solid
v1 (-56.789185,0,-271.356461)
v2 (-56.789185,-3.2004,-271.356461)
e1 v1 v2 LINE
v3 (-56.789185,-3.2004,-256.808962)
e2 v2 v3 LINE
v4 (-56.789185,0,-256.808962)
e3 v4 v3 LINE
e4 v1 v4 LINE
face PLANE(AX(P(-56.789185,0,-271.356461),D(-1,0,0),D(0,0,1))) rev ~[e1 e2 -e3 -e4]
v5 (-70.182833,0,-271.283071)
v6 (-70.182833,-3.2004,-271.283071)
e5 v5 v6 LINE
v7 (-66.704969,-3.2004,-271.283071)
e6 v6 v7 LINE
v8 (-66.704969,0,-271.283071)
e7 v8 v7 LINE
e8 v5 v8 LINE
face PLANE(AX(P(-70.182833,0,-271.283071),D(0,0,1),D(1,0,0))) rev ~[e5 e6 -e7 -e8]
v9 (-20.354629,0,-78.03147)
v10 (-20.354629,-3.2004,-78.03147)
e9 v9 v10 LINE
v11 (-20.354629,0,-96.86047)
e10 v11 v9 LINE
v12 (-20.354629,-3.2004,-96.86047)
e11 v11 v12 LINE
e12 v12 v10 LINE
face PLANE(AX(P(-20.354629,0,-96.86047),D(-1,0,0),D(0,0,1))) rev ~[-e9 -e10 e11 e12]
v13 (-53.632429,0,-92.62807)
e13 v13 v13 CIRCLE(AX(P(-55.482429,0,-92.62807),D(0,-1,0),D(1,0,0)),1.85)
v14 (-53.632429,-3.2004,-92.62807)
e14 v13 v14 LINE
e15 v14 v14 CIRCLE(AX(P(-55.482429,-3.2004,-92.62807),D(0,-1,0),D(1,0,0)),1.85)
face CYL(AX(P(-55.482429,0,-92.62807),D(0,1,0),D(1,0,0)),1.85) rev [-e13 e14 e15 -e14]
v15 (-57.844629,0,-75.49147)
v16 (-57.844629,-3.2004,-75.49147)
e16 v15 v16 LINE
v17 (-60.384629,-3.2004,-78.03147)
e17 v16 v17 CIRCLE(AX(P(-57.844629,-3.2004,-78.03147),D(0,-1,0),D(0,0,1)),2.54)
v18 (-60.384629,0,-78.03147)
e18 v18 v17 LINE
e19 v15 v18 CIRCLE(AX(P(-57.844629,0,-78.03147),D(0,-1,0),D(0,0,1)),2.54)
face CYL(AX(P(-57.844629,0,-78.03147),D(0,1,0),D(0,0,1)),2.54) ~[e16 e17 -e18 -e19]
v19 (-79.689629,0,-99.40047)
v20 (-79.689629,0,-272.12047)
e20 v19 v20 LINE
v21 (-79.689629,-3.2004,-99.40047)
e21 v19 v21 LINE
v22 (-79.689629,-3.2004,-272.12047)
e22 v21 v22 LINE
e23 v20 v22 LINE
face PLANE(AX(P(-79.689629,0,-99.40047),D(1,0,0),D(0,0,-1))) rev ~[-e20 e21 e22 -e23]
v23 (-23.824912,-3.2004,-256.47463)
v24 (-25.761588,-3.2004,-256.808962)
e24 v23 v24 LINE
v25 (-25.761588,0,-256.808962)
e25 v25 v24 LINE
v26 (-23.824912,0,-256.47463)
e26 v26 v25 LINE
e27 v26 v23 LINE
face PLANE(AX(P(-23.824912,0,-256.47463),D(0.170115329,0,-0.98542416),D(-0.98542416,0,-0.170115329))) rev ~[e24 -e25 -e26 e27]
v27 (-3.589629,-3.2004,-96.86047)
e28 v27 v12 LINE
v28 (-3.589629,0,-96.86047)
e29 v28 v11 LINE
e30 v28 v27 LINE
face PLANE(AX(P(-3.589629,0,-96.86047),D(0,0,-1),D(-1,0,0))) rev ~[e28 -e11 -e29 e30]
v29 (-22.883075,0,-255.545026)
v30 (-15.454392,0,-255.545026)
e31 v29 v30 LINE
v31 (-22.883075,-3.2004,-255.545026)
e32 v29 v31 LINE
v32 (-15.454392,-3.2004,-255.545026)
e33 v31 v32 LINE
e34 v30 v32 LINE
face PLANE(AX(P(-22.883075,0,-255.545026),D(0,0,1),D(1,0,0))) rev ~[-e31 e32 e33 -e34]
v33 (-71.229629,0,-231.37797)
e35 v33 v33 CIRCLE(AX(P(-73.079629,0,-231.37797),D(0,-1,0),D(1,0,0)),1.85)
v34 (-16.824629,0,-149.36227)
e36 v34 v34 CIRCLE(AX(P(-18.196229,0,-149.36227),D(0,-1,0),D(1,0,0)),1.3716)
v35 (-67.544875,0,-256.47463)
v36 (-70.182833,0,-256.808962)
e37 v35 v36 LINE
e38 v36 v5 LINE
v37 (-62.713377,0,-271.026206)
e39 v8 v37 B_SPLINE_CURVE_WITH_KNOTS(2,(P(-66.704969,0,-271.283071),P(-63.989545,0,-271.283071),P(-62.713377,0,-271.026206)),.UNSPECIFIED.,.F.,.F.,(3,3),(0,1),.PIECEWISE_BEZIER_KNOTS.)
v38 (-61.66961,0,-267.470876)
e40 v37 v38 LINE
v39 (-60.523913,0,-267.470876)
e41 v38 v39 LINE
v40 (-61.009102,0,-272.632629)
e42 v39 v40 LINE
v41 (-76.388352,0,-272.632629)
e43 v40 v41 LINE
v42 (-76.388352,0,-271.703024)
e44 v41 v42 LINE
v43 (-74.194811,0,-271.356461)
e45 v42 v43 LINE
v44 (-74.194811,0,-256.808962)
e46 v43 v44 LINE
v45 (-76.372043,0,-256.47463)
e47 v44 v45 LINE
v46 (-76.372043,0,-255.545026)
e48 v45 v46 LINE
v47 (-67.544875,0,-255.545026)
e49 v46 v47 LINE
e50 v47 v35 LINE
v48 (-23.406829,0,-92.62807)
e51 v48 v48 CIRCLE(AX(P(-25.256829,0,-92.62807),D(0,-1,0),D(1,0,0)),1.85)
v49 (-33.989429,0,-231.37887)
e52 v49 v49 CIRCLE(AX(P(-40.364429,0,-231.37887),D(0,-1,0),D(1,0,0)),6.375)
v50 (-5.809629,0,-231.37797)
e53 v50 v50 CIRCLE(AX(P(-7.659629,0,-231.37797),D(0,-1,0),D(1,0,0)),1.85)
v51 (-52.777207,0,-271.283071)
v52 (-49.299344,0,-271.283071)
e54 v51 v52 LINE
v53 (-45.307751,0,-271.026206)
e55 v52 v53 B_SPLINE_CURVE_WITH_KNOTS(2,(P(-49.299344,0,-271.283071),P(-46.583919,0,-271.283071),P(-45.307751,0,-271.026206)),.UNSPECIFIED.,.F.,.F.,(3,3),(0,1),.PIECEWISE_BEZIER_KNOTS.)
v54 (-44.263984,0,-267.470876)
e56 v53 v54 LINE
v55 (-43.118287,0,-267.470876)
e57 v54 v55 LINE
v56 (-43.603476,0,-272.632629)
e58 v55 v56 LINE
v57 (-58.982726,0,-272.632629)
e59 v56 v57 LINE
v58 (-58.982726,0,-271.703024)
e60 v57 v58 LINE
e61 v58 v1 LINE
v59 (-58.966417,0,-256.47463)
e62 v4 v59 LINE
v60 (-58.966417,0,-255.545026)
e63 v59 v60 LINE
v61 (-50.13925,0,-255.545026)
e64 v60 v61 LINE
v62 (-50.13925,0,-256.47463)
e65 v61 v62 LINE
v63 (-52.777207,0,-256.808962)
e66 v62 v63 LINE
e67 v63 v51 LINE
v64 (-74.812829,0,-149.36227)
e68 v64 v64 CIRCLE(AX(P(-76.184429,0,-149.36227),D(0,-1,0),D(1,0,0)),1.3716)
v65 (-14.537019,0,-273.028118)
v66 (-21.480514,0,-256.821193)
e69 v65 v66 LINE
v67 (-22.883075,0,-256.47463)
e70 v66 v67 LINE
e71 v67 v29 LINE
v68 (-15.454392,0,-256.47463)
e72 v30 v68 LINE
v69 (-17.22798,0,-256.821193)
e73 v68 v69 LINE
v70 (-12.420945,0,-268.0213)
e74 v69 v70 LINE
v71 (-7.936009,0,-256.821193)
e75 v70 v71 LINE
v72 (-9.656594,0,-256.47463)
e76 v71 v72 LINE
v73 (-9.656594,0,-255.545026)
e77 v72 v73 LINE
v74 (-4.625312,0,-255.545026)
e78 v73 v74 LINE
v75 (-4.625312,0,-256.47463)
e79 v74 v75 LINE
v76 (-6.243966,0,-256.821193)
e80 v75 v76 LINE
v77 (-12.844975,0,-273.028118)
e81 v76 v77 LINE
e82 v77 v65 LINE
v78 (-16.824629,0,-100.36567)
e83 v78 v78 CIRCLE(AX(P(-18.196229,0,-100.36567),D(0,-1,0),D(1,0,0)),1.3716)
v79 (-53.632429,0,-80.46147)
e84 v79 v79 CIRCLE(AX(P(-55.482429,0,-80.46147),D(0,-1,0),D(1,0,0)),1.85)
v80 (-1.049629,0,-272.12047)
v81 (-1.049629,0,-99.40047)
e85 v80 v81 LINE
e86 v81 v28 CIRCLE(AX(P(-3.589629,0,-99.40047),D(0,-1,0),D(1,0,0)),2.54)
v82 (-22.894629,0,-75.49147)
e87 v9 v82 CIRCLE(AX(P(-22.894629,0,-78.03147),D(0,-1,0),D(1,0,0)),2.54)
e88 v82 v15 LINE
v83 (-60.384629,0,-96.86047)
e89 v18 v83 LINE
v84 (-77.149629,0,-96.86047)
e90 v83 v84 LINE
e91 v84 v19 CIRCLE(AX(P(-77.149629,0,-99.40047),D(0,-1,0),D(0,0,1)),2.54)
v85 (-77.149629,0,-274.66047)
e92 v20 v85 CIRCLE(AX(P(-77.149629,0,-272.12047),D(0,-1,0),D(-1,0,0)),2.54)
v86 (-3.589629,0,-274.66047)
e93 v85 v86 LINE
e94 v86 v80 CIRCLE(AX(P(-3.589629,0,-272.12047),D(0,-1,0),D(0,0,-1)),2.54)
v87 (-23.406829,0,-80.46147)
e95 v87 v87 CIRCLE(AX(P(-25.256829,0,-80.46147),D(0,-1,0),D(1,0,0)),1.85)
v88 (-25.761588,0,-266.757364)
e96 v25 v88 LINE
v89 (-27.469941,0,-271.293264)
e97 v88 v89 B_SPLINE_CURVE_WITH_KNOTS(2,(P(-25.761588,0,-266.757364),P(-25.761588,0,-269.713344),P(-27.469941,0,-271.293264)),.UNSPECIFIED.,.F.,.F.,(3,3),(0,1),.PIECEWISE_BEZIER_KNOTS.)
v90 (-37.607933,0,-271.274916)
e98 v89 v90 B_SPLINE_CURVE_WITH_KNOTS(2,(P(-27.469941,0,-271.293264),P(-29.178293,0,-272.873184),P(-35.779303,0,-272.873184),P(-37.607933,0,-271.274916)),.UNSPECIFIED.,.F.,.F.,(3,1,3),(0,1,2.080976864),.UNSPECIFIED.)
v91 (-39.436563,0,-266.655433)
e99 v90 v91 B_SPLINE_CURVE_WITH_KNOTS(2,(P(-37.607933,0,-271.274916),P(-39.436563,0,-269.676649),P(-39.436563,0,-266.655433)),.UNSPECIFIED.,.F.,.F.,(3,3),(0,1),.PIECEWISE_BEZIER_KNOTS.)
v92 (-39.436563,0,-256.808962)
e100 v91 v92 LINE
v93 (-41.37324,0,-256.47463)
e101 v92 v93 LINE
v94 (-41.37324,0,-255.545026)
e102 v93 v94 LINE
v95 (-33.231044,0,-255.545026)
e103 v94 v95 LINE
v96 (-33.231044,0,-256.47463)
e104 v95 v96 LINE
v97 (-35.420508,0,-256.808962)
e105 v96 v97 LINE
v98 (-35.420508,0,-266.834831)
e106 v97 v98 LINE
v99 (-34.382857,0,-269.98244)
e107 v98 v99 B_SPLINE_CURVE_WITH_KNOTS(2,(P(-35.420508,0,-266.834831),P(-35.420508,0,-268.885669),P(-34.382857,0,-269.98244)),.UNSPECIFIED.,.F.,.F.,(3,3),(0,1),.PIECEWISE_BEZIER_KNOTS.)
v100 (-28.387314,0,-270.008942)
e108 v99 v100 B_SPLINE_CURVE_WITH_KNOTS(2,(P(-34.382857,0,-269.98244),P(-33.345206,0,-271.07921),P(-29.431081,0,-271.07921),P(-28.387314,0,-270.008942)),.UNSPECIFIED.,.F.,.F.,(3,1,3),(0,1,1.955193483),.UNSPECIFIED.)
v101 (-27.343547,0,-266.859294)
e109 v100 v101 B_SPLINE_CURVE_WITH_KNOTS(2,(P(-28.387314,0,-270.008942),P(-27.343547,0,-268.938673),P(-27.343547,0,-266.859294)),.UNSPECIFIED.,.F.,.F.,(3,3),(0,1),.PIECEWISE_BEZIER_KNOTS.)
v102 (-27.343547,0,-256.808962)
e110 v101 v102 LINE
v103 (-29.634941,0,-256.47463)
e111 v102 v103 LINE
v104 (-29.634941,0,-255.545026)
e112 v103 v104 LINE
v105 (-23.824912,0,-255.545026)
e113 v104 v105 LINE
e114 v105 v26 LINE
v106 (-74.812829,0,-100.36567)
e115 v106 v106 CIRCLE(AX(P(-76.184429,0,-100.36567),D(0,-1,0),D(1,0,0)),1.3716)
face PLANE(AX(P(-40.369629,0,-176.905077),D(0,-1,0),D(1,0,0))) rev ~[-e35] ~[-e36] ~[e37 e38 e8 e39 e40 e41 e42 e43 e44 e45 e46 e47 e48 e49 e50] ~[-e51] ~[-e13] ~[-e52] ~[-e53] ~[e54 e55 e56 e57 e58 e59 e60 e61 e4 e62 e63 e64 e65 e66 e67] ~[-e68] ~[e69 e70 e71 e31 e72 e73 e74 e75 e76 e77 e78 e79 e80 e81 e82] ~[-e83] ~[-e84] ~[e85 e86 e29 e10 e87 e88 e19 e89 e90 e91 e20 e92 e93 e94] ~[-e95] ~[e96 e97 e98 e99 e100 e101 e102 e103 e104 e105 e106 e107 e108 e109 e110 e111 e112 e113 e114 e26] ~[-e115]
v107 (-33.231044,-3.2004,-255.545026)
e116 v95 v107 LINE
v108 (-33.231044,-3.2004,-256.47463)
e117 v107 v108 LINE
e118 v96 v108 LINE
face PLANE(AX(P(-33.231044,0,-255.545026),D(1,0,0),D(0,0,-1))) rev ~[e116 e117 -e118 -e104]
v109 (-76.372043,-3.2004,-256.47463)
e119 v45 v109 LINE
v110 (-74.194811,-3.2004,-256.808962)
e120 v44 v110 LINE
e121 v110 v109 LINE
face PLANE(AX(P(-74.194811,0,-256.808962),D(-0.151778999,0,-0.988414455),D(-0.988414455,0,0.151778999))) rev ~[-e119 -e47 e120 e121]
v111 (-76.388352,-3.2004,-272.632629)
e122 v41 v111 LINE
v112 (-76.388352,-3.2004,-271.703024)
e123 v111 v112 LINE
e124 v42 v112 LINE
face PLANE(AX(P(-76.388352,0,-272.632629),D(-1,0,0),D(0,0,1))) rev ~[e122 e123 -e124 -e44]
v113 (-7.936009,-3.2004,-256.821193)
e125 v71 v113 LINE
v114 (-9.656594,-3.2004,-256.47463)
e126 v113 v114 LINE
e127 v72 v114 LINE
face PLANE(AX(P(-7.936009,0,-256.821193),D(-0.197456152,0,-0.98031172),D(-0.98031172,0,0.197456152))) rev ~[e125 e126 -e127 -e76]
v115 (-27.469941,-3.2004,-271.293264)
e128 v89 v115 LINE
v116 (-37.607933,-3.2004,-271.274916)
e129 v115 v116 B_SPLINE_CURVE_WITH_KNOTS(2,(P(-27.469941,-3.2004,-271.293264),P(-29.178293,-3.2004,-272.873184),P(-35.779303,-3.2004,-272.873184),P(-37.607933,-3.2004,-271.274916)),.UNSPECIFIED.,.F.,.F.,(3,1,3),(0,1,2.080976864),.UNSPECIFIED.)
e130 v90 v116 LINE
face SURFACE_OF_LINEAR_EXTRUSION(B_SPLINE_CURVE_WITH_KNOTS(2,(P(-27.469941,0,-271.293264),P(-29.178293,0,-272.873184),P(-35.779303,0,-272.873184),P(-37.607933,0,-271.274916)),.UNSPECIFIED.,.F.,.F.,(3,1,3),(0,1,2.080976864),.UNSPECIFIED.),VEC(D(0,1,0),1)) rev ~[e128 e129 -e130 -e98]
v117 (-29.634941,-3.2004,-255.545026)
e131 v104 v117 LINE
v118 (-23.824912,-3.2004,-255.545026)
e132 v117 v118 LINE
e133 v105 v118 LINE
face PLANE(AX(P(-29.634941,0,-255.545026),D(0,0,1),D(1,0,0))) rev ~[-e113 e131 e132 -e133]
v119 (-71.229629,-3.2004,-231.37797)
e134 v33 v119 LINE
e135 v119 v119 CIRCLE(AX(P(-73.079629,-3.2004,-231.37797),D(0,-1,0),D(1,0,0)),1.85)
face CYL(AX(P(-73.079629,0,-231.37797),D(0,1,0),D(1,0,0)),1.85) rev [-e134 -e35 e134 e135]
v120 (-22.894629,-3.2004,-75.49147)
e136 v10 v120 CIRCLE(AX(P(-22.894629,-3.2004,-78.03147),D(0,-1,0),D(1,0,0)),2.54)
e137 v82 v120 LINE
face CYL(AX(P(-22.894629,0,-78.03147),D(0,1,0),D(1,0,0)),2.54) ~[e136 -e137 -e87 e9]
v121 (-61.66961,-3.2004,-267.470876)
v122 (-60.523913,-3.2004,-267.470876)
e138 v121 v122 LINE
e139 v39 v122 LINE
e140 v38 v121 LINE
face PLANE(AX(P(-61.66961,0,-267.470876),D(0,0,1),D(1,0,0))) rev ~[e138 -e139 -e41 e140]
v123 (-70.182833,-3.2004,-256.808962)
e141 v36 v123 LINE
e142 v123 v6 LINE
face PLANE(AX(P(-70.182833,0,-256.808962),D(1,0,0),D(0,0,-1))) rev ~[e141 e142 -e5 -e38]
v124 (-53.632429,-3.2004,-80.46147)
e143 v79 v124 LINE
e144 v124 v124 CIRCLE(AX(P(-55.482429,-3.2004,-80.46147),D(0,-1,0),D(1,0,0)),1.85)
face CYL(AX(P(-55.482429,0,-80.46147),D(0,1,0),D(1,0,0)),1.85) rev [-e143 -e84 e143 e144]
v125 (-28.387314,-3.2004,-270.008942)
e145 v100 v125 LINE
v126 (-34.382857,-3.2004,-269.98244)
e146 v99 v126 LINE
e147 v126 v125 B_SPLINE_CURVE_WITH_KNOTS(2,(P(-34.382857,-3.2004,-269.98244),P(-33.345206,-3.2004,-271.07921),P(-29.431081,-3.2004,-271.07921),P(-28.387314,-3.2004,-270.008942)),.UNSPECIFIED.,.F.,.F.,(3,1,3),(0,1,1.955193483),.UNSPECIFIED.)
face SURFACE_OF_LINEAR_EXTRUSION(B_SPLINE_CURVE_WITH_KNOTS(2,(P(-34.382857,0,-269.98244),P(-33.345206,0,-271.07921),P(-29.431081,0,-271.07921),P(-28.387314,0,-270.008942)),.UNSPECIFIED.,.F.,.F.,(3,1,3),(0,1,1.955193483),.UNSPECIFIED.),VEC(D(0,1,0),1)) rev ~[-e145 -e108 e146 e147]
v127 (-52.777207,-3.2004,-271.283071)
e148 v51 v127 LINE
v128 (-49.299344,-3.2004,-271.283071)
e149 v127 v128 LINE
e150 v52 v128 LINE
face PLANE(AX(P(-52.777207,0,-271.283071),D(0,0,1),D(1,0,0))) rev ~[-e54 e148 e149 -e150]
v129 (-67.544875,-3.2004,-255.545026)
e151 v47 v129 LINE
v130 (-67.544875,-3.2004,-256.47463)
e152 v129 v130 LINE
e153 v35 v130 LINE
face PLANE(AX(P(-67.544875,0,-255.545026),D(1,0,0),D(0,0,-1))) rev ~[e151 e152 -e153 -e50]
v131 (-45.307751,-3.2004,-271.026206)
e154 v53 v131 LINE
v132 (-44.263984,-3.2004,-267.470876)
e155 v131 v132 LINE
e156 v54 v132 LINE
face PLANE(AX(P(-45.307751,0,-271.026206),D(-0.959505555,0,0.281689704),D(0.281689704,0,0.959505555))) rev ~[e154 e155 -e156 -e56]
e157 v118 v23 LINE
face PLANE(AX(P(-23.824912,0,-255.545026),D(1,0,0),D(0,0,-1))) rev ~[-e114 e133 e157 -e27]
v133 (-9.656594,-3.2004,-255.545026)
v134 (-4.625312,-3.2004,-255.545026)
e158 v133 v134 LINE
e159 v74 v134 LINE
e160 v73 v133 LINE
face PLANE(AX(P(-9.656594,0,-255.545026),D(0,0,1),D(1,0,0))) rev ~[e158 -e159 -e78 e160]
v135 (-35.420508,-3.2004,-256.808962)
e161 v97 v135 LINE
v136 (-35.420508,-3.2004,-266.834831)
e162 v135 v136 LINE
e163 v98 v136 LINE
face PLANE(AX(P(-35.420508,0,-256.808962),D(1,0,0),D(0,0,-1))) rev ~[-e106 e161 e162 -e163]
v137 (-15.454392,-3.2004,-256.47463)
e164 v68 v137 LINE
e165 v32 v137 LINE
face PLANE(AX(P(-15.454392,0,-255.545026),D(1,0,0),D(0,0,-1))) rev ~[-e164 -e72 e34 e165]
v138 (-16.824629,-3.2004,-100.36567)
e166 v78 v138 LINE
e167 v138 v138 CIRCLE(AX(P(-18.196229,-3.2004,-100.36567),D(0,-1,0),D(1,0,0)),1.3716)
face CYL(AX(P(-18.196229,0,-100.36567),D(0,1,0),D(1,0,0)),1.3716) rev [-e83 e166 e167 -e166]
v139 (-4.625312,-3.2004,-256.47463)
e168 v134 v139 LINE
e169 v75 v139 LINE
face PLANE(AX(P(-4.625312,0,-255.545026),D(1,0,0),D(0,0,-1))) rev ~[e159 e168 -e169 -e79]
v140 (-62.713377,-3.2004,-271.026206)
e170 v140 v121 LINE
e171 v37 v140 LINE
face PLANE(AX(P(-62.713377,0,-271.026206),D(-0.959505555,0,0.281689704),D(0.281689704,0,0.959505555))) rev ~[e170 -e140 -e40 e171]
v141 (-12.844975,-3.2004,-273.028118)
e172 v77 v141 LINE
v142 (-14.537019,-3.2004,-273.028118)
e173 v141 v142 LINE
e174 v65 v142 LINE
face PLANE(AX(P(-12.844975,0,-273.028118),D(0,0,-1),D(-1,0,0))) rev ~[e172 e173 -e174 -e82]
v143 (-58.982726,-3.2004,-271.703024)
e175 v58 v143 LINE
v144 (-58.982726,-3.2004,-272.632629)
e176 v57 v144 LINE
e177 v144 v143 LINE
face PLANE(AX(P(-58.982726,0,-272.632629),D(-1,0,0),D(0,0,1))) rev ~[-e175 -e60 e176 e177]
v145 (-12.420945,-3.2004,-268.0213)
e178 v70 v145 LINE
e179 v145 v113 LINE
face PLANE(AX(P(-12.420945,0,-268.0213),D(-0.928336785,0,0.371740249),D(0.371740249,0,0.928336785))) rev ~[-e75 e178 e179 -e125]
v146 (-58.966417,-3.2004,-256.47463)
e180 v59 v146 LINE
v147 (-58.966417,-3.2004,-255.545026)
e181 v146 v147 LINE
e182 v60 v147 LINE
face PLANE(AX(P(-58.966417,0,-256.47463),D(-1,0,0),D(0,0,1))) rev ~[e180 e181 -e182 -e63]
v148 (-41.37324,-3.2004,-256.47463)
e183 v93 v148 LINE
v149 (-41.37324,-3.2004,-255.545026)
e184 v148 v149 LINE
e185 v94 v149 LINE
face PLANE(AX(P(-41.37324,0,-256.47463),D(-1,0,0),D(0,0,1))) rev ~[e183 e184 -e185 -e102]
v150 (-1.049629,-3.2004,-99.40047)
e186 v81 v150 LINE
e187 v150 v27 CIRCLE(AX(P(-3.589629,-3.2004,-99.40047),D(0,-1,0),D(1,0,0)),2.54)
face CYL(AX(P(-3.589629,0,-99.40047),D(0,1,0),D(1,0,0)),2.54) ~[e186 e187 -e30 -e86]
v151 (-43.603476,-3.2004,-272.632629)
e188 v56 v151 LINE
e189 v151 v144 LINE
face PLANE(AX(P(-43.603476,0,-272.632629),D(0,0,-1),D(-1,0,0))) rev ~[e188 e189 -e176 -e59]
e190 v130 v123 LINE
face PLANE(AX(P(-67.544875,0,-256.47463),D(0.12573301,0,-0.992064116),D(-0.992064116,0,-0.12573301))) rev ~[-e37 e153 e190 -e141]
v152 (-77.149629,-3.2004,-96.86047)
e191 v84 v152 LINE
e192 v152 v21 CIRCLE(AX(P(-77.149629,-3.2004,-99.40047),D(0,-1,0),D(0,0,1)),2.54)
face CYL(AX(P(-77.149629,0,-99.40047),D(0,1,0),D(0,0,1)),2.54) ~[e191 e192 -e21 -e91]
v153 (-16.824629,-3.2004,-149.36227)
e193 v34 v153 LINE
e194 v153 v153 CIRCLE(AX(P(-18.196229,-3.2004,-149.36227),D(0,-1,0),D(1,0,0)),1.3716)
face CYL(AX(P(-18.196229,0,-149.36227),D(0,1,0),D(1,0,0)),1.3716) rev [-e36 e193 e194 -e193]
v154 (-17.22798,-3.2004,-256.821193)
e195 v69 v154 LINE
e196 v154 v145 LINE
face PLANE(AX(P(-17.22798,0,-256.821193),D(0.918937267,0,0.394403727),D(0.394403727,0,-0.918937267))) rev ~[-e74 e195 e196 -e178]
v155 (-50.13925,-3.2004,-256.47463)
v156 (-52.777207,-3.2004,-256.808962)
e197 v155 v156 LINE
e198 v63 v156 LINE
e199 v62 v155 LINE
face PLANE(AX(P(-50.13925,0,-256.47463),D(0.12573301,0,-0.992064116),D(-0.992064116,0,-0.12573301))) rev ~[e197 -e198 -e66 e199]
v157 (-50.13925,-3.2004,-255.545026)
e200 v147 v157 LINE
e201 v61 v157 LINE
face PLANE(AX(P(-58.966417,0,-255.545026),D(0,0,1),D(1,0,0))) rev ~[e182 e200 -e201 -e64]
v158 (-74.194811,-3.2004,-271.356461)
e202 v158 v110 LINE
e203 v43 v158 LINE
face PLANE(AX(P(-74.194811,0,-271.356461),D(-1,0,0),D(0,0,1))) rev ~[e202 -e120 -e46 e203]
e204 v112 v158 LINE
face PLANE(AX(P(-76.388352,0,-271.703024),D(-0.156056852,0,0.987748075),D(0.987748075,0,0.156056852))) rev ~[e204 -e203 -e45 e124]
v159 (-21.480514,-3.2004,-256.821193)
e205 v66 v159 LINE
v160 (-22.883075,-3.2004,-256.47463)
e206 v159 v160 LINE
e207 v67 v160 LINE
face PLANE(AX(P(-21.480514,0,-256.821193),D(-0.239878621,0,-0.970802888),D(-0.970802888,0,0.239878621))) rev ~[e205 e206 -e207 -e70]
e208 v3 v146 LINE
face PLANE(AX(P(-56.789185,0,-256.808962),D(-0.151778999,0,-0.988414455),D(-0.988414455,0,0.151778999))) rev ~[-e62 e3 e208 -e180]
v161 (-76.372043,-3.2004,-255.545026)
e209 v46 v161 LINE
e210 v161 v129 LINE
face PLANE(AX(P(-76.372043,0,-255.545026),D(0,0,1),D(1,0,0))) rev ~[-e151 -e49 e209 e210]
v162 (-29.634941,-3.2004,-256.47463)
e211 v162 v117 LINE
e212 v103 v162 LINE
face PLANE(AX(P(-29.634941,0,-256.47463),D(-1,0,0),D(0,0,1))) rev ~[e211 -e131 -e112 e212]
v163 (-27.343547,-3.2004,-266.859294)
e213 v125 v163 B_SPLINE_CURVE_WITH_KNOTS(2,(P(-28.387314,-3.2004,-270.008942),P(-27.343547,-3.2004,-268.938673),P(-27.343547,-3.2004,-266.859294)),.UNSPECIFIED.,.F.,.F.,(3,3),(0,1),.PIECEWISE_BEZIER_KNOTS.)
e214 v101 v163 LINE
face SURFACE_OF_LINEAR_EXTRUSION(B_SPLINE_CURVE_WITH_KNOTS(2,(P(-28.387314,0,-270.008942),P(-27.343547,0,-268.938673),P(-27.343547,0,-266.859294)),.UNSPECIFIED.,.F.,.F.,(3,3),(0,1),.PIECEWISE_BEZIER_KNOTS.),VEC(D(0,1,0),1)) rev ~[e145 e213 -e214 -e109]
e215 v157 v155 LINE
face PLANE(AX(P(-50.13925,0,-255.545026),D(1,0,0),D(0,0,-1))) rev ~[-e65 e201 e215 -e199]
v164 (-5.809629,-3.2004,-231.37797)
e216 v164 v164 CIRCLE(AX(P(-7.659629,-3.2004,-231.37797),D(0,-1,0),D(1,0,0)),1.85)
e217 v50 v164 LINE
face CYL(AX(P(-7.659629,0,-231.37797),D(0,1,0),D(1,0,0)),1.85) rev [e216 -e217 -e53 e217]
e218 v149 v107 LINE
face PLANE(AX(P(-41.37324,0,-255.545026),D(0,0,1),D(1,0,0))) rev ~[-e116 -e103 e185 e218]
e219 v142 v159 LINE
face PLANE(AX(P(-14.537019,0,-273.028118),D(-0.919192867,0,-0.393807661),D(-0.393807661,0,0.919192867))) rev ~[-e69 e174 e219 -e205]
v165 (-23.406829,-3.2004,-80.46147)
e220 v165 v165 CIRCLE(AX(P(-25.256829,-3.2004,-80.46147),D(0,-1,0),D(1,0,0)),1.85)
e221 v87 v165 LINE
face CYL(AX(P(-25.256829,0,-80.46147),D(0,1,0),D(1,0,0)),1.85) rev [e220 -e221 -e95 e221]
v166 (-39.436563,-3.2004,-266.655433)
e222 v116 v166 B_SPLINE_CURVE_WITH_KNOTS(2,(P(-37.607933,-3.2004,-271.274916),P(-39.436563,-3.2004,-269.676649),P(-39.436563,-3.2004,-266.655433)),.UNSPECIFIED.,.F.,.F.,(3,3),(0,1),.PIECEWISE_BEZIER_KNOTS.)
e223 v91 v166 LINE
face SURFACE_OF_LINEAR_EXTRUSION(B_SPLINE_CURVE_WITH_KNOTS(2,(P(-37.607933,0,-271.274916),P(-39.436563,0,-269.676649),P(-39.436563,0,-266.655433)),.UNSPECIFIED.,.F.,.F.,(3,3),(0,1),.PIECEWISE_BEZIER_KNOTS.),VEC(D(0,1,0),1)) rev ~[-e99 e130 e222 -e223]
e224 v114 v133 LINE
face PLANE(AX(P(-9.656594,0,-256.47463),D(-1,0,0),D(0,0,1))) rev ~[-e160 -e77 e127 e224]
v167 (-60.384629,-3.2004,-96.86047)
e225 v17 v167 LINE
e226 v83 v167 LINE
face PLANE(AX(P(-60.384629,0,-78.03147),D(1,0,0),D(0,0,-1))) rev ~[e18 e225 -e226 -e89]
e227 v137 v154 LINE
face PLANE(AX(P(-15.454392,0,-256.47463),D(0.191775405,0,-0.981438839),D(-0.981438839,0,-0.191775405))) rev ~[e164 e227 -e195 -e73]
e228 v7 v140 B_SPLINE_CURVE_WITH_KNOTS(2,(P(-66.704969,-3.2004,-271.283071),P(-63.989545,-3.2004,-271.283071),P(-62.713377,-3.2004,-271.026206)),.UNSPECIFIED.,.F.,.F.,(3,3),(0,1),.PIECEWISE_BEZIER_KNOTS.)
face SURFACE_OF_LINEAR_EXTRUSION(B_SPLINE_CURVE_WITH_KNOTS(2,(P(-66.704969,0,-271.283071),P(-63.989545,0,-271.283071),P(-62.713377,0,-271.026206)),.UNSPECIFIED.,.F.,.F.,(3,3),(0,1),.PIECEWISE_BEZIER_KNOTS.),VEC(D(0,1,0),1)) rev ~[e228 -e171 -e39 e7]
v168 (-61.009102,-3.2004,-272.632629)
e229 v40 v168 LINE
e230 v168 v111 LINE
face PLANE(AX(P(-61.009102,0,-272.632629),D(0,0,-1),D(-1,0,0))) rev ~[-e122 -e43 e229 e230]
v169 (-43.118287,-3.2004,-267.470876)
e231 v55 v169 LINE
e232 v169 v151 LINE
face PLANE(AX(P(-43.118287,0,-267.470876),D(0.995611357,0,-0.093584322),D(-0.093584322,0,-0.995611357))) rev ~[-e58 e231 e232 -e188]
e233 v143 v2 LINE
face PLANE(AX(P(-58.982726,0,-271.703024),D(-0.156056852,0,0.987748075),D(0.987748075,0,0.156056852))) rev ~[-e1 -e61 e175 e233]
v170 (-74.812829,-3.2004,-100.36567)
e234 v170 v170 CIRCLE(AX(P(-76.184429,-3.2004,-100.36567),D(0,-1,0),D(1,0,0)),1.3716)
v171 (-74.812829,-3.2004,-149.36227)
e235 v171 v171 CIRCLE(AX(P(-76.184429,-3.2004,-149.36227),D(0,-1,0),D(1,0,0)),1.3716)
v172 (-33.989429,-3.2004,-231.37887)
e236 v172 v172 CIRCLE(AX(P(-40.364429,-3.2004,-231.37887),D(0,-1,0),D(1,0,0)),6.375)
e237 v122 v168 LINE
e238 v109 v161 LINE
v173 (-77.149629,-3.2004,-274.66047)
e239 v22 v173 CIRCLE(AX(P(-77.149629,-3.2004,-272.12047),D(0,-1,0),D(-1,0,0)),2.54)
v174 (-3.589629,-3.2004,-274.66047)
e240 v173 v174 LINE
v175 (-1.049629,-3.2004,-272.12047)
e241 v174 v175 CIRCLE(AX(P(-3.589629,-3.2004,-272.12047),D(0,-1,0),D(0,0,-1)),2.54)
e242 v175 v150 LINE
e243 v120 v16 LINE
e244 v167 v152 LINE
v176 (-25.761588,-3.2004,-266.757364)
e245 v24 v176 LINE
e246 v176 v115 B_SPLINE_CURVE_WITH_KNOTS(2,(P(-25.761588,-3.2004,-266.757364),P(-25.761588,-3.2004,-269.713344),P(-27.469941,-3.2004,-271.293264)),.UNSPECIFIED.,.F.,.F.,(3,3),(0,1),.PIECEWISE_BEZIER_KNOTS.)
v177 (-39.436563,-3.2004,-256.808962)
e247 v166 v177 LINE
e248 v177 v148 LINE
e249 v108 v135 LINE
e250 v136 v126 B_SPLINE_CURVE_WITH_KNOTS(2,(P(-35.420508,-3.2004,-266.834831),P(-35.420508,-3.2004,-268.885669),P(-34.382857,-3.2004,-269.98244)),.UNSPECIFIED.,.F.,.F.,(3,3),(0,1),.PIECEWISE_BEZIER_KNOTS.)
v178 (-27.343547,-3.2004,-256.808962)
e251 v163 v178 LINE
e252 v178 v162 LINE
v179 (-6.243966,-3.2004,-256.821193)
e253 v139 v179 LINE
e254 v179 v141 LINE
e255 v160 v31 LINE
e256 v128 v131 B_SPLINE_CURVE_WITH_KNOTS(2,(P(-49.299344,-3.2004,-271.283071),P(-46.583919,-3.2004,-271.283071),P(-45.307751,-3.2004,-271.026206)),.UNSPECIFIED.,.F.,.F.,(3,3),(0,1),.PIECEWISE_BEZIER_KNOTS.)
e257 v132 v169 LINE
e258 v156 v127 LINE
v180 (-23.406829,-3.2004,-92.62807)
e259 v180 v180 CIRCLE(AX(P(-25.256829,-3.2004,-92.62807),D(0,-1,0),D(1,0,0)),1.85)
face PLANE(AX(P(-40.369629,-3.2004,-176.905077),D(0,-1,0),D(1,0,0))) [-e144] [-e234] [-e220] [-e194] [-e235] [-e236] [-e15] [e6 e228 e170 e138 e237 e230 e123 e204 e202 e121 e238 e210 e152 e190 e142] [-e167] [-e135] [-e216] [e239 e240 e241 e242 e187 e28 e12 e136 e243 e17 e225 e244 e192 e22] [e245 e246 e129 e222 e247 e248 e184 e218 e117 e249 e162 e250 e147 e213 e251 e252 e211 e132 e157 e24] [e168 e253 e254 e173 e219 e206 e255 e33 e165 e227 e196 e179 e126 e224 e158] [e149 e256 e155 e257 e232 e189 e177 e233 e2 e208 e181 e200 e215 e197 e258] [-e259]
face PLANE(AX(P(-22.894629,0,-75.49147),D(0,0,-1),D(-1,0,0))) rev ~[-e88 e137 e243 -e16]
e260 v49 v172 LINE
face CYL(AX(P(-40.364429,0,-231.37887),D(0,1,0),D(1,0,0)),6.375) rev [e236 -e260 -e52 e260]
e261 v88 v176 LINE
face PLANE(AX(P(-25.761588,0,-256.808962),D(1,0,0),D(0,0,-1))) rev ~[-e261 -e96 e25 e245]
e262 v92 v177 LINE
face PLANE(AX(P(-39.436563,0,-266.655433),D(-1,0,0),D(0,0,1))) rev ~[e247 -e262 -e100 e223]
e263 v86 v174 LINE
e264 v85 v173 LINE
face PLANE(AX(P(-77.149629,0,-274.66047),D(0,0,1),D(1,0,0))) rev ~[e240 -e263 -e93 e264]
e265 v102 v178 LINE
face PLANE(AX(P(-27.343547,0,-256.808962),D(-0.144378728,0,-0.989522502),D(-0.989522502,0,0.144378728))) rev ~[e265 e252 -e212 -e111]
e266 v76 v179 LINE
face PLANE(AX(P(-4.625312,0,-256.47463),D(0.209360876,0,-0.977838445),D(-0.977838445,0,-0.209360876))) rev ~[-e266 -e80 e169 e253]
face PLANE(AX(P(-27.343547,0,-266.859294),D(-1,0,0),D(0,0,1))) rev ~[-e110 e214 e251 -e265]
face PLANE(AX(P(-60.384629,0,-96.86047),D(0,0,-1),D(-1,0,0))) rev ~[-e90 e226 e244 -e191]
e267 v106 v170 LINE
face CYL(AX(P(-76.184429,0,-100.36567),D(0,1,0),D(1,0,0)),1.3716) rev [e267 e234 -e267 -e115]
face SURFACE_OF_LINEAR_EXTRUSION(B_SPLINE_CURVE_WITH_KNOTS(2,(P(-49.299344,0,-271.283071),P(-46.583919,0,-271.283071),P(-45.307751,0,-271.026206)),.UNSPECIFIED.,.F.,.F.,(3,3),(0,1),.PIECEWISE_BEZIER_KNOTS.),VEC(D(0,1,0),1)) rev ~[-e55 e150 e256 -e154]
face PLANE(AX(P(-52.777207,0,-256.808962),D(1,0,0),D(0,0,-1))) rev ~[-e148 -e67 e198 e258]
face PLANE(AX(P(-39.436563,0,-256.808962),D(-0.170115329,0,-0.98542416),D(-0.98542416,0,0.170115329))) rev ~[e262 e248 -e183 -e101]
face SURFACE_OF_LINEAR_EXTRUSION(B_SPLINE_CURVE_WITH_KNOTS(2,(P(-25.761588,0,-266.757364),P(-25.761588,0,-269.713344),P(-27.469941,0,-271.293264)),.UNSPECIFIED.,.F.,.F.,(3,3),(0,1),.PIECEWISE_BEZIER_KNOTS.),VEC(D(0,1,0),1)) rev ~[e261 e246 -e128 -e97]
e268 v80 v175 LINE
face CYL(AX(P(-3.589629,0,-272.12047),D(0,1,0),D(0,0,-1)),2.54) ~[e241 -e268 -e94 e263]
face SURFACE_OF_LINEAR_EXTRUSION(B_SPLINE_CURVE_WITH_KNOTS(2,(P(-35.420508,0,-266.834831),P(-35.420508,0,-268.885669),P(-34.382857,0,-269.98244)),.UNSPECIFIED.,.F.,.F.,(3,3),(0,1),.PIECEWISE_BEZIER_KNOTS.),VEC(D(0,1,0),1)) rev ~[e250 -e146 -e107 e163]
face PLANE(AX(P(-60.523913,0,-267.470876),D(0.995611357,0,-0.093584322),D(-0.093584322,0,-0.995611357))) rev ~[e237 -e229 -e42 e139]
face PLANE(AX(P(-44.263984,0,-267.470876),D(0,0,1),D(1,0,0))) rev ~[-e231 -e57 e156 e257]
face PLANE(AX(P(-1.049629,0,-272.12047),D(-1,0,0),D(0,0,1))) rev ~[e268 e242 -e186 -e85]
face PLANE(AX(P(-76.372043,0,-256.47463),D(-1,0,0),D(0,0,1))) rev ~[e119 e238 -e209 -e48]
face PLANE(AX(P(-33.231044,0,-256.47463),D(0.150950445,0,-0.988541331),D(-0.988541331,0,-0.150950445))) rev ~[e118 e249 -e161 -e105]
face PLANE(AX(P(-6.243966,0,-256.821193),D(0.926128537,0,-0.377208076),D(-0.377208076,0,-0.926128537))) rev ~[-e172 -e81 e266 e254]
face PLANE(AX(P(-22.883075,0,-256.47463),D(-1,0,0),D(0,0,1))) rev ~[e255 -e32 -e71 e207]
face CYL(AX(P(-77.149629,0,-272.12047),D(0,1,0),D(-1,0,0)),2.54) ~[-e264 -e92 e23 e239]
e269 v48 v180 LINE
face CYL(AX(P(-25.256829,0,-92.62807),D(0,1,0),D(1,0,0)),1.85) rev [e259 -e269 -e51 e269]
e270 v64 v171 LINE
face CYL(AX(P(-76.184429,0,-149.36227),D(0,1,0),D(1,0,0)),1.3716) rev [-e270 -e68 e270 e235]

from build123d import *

# Parameters (mm, degrees)
F0_R     = 1.85
F0_R_2   = 6.375
F0_R_3   = 1.3716
F1_DEPTH = 3.2004


with BuildPart() as f1:
    # F0 (on Front) → F1 (new body)
    with BuildSketch(Plane.XZ):
        with BuildLine():
            ThreePointArc((-79.689629, -272.1204697257), (-78.9456802243, -273.91652095), (-77.149629, -274.6604697257))
            Line((-77.149629, -274.6604697257), (-3.589629, -274.6604697257))
            ThreePointArc((-3.589629, -274.6604697257), (-1.7935777758, -273.9165209499), (-1.049629, -272.1204697257))
            Line((-1.049629, -272.1204697257), (-1.049629, -99.4004697257))
            ThreePointArc((-1.049629, -99.4004697257), (-1.7935777758, -97.6044185016), (-3.589629, -96.8604697257))
            Line((-3.589629, -96.8604697257), (-20.354629, -96.8604697257))
            Line((-20.354629, -96.8604697257), (-20.354629, -78.0314697257))
            ThreePointArc((-20.354629, -78.0314697257), (-21.0985777758, -76.2354185016), (-22.894629, -75.4914697257))
            Line((-22.894629, -75.4914697257), (-57.844629, -75.4914697257))
            ThreePointArc((-57.844629, -75.4914697257), (-59.6406802243, -76.2354185015), (-60.384629, -78.0314697257))
            Line((-60.384629, -78.0314697257), (-60.384629, -96.8604697257))
            Line((-60.384629, -96.8604697257), (-77.149629, -96.8604697257))
            ThreePointArc((-77.149629, -96.8604697257), (-78.9456802243, -97.6044185015), (-79.689629, -99.4004697257))
            Line((-79.689629, -99.4004697257), (-79.689629, -272.1204697257))
        make_face()
        with BuildLine():
            Line((-67.5448753625, -255.545025575), (-67.5448753625, -256.4746303251))
            Line((-67.5448753625, -256.4746303251), (-70.1828327017, -256.808961858))
            Line((-70.1828327017, -256.808961858), (-70.1828327017, -271.2830709061))
            Line((-70.1828327017, -271.2830709061), (-66.7049693163, -271.2830709061))
            add(Edge.make_bspline(
                [(-66.7049693163, -271.2830709061), (-63.9895449146, -271.2830709061), (-62.7133769901, -271.0262064356)],
                knots=[0, 0, 0, 1, 1, 1], degree=2))
            Line((-62.7133769901, -271.0262064356), (-61.6696102531, -267.4708759878))
            Line((-61.6696102531, -267.4708759878), (-60.5239131707, -267.4708759878))
            Line((-60.5239131707, -267.4708759878), (-61.0091016149, -272.6326286793))
            Line((-61.0091016149, -272.6326286793), (-76.3883521301, -272.6326286793))
            Line((-76.3883521301, -272.6326286793), (-76.3883521301, -271.7030239291))
            Line((-76.3883521301, -271.7030239291), (-74.1948110969, -271.3564607548))
            Line((-74.1948110969, -271.3564607548), (-74.1948110969, -256.808961858))
            Line((-74.1948110969, -256.808961858), (-76.3720432749, -256.4746303251))
            Line((-76.3720432749, -256.4746303251), (-76.3720432749, -255.545025575))
            Line((-76.3720432749, -255.545025575), (-67.5448753625, -255.545025575))
        make_face(mode=Mode.SUBTRACT)
        with Locations((-73.079629, -231.3779697257)):
            Circle(F0_R, mode=Mode.SUBTRACT)
        with BuildLine():
            Line((-50.1392495805, -255.545025575), (-50.1392495805, -256.4746303251))
            Line((-50.1392495805, -256.4746303251), (-52.7772069197, -256.808961858))
            Line((-52.7772069197, -256.808961858), (-52.7772069197, -271.2830709061))
            Line((-52.7772069197, -271.2830709061), (-49.2993435343, -271.2830709061))
            add(Edge.make_bspline(
                [(-49.2993435343, -271.2830709061), (-46.5839191327, -271.2830709061), (-45.3077512081, -271.0262064356)],
                knots=[0, 0, 0, 1, 1, 1], degree=2))
            Line((-45.3077512081, -271.0262064356), (-44.2639844712, -267.4708759878))
            Line((-44.2639844712, -267.4708759878), (-43.1182873888, -267.4708759878))
            Line((-43.1182873888, -267.4708759878), (-43.6034758329, -272.6326286793))
            Line((-43.6034758329, -272.6326286793), (-58.9827263482, -272.6326286793))
            Line((-58.9827263482, -272.6326286793), (-58.9827263482, -271.7030239291))
            Line((-58.9827263482, -271.7030239291), (-56.789185315, -271.3564607548))
            Line((-56.789185315, -271.3564607548), (-56.789185315, -256.808961858))
            Line((-56.789185315, -256.808961858), (-58.9664174929, -256.4746303251))
            Line((-58.9664174929, -256.4746303251), (-58.9664174929, -255.545025575))
            Line((-58.9664174929, -255.545025575), (-50.1392495805, -255.545025575))
        make_face(mode=Mode.SUBTRACT)
        with BuildLine():
            add(Edge.make_bspline(
                [(-34.3828567872, -269.9824396987), (-33.345205871, -271.0792102152), (-31.3432938872, -271.0792102152)],
                knots=[0, 0, 0, 1, 1, 1], degree=2))
            add(Edge.make_bspline(
                [(-31.3432938872, -271.0792102152), (-29.4310806073, -271.0792102152), (-28.3873138703, -270.0089415885)],
                knots=[0, 0, 0, 1, 1, 1], degree=2))
            add(Edge.make_bspline(
                [(-28.3873138703, -270.0089415885), (-27.3435471333, -268.9386729617), (-27.3435471333, -266.8592939153)],
                knots=[0, 0, 0, 1, 1, 1], degree=2))
            Line((-27.3435471333, -266.8592939153), (-27.3435471333, -256.808961858))
            Line((-27.3435471333, -256.808961858), (-29.6349412981, -256.4746303251))
            Line((-29.6349412981, -256.4746303251), (-29.6349412981, -255.545025575))
            Line((-29.6349412981, -255.545025575), (-23.8249116098, -255.545025575))
            Line((-23.8249116098, -255.545025575), (-23.8249116098, -256.4746303251))
            Line((-23.8249116098, -256.4746303251), (-25.7615881726, -256.808961858))
            Line((-25.7615881726, -256.808961858), (-25.7615881726, -266.7573635699))
            add(Edge.make_bspline(
                [(-25.7615881726, -266.7573635699), (-25.7615881726, -269.7133435868), (-27.4699407616, -271.2932639406)],
                knots=[0, 0, 0, 1, 1, 1], degree=2))
            add(Edge.make_bspline(
                [(-27.4699407616, -271.2932639406), (-29.1782933507, -272.8731842944), (-32.3503656998, -272.8731842944)],
                knots=[0, 0, 0, 1, 1, 1], degree=2))
            add(Edge.make_bspline(
                [(-32.3503656998, -272.8731842944), (-35.7793025193, -272.8731842944), (-37.607932916, -271.2749164784)],
                knots=[0, 0, 0, 1, 1, 1], degree=2))
            add(Edge.make_bspline(
                [(-37.607932916, -271.2749164784), (-39.4365633126, -269.6766486624), (-39.4365633126, -266.6554332245)],
                knots=[0, 0, 0, 1, 1, 1], degree=2))
            Line((-39.4365633126, -266.6554332245), (-39.4365633126, -256.808961858))
            Line((-39.4365633126, -256.808961858), (-41.3732398754, -256.4746303251))
            Line((-41.3732398754, -256.4746303251), (-41.3732398754, -255.545025575))
            Line((-41.3732398754, -255.545025575), (-33.2310438841, -255.545025575))
            Line((-33.2310438841, -255.545025575), (-33.2310438841, -256.4746303251))
            Line((-33.2310438841, -256.4746303251), (-35.4205077035, -256.808961858))
            Line((-35.4205077035, -256.808961858), (-35.4205077035, -266.8348306324))
            add(Edge.make_bspline(
                [(-35.4205077035, -266.8348306324), (-35.4205077035, -268.8856691821), (-34.3828567872, -269.9824396987)],
                knots=[0, 0, 0, 1, 1, 1], degree=2))
        make_face(mode=Mode.SUBTRACT)
        with Locations((-40.364429, -231.3788697257)):
            Circle(F0_R_2, mode=Mode.SUBTRACT)
        Polygon((-9.656593598, -255.545025575), (-4.6253117486, -255.545025575), (-4.6253117486, -256.4746303251), (-6.2439656337, -256.8211934995), (-12.8449748024, -273.0281184195), (-14.5370185362, -273.0281184195), (-21.4805136654, -256.8211934995), (-22.8830752182, -256.4746303251), (-22.8830752182, -255.545025575), (-15.4543916449, -255.545025575), (-15.4543916449, -256.4746303251), (-17.227979655, -256.8211934995), (-12.4209445655, -268.021299853), (-7.9360093675, -256.8211934995), (-9.656593598, -256.4746303251), align=None, mode=Mode.SUBTRACT)
        with Locations((-7.659629, -231.3779697257)):
            Circle(F0_R, mode=Mode.SUBTRACT)
        with Locations((-76.184429, -149.3622697257)):
            Circle(F0_R_3, mode=Mode.SUBTRACT)
        with Locations((-76.184429, -100.3656697257)):
            Circle(F0_R_3, mode=Mode.SUBTRACT)
        with Locations((-55.482429, -92.6280697257)):
            Circle(F0_R, mode=Mode.SUBTRACT)
        with Locations((-55.482429, -80.4614697257)):
            Circle(F0_R, mode=Mode.SUBTRACT)
        with Locations((-18.196229, -149.3622697257)):
            Circle(F0_R_3, mode=Mode.SUBTRACT)
        with Locations((-25.256829, -92.6280697257)):
            Circle(F0_R, mode=Mode.SUBTRACT)
        with Locations((-25.256829, -80.4614697257)):
            Circle(F0_R, mode=Mode.SUBTRACT)
        with Locations((-18.196229, -100.3656697257)):
            Circle(F0_R_3, mode=Mode.SUBTRACT)
    extrude(amount=F1_DEPTH)


solid = f1.part
